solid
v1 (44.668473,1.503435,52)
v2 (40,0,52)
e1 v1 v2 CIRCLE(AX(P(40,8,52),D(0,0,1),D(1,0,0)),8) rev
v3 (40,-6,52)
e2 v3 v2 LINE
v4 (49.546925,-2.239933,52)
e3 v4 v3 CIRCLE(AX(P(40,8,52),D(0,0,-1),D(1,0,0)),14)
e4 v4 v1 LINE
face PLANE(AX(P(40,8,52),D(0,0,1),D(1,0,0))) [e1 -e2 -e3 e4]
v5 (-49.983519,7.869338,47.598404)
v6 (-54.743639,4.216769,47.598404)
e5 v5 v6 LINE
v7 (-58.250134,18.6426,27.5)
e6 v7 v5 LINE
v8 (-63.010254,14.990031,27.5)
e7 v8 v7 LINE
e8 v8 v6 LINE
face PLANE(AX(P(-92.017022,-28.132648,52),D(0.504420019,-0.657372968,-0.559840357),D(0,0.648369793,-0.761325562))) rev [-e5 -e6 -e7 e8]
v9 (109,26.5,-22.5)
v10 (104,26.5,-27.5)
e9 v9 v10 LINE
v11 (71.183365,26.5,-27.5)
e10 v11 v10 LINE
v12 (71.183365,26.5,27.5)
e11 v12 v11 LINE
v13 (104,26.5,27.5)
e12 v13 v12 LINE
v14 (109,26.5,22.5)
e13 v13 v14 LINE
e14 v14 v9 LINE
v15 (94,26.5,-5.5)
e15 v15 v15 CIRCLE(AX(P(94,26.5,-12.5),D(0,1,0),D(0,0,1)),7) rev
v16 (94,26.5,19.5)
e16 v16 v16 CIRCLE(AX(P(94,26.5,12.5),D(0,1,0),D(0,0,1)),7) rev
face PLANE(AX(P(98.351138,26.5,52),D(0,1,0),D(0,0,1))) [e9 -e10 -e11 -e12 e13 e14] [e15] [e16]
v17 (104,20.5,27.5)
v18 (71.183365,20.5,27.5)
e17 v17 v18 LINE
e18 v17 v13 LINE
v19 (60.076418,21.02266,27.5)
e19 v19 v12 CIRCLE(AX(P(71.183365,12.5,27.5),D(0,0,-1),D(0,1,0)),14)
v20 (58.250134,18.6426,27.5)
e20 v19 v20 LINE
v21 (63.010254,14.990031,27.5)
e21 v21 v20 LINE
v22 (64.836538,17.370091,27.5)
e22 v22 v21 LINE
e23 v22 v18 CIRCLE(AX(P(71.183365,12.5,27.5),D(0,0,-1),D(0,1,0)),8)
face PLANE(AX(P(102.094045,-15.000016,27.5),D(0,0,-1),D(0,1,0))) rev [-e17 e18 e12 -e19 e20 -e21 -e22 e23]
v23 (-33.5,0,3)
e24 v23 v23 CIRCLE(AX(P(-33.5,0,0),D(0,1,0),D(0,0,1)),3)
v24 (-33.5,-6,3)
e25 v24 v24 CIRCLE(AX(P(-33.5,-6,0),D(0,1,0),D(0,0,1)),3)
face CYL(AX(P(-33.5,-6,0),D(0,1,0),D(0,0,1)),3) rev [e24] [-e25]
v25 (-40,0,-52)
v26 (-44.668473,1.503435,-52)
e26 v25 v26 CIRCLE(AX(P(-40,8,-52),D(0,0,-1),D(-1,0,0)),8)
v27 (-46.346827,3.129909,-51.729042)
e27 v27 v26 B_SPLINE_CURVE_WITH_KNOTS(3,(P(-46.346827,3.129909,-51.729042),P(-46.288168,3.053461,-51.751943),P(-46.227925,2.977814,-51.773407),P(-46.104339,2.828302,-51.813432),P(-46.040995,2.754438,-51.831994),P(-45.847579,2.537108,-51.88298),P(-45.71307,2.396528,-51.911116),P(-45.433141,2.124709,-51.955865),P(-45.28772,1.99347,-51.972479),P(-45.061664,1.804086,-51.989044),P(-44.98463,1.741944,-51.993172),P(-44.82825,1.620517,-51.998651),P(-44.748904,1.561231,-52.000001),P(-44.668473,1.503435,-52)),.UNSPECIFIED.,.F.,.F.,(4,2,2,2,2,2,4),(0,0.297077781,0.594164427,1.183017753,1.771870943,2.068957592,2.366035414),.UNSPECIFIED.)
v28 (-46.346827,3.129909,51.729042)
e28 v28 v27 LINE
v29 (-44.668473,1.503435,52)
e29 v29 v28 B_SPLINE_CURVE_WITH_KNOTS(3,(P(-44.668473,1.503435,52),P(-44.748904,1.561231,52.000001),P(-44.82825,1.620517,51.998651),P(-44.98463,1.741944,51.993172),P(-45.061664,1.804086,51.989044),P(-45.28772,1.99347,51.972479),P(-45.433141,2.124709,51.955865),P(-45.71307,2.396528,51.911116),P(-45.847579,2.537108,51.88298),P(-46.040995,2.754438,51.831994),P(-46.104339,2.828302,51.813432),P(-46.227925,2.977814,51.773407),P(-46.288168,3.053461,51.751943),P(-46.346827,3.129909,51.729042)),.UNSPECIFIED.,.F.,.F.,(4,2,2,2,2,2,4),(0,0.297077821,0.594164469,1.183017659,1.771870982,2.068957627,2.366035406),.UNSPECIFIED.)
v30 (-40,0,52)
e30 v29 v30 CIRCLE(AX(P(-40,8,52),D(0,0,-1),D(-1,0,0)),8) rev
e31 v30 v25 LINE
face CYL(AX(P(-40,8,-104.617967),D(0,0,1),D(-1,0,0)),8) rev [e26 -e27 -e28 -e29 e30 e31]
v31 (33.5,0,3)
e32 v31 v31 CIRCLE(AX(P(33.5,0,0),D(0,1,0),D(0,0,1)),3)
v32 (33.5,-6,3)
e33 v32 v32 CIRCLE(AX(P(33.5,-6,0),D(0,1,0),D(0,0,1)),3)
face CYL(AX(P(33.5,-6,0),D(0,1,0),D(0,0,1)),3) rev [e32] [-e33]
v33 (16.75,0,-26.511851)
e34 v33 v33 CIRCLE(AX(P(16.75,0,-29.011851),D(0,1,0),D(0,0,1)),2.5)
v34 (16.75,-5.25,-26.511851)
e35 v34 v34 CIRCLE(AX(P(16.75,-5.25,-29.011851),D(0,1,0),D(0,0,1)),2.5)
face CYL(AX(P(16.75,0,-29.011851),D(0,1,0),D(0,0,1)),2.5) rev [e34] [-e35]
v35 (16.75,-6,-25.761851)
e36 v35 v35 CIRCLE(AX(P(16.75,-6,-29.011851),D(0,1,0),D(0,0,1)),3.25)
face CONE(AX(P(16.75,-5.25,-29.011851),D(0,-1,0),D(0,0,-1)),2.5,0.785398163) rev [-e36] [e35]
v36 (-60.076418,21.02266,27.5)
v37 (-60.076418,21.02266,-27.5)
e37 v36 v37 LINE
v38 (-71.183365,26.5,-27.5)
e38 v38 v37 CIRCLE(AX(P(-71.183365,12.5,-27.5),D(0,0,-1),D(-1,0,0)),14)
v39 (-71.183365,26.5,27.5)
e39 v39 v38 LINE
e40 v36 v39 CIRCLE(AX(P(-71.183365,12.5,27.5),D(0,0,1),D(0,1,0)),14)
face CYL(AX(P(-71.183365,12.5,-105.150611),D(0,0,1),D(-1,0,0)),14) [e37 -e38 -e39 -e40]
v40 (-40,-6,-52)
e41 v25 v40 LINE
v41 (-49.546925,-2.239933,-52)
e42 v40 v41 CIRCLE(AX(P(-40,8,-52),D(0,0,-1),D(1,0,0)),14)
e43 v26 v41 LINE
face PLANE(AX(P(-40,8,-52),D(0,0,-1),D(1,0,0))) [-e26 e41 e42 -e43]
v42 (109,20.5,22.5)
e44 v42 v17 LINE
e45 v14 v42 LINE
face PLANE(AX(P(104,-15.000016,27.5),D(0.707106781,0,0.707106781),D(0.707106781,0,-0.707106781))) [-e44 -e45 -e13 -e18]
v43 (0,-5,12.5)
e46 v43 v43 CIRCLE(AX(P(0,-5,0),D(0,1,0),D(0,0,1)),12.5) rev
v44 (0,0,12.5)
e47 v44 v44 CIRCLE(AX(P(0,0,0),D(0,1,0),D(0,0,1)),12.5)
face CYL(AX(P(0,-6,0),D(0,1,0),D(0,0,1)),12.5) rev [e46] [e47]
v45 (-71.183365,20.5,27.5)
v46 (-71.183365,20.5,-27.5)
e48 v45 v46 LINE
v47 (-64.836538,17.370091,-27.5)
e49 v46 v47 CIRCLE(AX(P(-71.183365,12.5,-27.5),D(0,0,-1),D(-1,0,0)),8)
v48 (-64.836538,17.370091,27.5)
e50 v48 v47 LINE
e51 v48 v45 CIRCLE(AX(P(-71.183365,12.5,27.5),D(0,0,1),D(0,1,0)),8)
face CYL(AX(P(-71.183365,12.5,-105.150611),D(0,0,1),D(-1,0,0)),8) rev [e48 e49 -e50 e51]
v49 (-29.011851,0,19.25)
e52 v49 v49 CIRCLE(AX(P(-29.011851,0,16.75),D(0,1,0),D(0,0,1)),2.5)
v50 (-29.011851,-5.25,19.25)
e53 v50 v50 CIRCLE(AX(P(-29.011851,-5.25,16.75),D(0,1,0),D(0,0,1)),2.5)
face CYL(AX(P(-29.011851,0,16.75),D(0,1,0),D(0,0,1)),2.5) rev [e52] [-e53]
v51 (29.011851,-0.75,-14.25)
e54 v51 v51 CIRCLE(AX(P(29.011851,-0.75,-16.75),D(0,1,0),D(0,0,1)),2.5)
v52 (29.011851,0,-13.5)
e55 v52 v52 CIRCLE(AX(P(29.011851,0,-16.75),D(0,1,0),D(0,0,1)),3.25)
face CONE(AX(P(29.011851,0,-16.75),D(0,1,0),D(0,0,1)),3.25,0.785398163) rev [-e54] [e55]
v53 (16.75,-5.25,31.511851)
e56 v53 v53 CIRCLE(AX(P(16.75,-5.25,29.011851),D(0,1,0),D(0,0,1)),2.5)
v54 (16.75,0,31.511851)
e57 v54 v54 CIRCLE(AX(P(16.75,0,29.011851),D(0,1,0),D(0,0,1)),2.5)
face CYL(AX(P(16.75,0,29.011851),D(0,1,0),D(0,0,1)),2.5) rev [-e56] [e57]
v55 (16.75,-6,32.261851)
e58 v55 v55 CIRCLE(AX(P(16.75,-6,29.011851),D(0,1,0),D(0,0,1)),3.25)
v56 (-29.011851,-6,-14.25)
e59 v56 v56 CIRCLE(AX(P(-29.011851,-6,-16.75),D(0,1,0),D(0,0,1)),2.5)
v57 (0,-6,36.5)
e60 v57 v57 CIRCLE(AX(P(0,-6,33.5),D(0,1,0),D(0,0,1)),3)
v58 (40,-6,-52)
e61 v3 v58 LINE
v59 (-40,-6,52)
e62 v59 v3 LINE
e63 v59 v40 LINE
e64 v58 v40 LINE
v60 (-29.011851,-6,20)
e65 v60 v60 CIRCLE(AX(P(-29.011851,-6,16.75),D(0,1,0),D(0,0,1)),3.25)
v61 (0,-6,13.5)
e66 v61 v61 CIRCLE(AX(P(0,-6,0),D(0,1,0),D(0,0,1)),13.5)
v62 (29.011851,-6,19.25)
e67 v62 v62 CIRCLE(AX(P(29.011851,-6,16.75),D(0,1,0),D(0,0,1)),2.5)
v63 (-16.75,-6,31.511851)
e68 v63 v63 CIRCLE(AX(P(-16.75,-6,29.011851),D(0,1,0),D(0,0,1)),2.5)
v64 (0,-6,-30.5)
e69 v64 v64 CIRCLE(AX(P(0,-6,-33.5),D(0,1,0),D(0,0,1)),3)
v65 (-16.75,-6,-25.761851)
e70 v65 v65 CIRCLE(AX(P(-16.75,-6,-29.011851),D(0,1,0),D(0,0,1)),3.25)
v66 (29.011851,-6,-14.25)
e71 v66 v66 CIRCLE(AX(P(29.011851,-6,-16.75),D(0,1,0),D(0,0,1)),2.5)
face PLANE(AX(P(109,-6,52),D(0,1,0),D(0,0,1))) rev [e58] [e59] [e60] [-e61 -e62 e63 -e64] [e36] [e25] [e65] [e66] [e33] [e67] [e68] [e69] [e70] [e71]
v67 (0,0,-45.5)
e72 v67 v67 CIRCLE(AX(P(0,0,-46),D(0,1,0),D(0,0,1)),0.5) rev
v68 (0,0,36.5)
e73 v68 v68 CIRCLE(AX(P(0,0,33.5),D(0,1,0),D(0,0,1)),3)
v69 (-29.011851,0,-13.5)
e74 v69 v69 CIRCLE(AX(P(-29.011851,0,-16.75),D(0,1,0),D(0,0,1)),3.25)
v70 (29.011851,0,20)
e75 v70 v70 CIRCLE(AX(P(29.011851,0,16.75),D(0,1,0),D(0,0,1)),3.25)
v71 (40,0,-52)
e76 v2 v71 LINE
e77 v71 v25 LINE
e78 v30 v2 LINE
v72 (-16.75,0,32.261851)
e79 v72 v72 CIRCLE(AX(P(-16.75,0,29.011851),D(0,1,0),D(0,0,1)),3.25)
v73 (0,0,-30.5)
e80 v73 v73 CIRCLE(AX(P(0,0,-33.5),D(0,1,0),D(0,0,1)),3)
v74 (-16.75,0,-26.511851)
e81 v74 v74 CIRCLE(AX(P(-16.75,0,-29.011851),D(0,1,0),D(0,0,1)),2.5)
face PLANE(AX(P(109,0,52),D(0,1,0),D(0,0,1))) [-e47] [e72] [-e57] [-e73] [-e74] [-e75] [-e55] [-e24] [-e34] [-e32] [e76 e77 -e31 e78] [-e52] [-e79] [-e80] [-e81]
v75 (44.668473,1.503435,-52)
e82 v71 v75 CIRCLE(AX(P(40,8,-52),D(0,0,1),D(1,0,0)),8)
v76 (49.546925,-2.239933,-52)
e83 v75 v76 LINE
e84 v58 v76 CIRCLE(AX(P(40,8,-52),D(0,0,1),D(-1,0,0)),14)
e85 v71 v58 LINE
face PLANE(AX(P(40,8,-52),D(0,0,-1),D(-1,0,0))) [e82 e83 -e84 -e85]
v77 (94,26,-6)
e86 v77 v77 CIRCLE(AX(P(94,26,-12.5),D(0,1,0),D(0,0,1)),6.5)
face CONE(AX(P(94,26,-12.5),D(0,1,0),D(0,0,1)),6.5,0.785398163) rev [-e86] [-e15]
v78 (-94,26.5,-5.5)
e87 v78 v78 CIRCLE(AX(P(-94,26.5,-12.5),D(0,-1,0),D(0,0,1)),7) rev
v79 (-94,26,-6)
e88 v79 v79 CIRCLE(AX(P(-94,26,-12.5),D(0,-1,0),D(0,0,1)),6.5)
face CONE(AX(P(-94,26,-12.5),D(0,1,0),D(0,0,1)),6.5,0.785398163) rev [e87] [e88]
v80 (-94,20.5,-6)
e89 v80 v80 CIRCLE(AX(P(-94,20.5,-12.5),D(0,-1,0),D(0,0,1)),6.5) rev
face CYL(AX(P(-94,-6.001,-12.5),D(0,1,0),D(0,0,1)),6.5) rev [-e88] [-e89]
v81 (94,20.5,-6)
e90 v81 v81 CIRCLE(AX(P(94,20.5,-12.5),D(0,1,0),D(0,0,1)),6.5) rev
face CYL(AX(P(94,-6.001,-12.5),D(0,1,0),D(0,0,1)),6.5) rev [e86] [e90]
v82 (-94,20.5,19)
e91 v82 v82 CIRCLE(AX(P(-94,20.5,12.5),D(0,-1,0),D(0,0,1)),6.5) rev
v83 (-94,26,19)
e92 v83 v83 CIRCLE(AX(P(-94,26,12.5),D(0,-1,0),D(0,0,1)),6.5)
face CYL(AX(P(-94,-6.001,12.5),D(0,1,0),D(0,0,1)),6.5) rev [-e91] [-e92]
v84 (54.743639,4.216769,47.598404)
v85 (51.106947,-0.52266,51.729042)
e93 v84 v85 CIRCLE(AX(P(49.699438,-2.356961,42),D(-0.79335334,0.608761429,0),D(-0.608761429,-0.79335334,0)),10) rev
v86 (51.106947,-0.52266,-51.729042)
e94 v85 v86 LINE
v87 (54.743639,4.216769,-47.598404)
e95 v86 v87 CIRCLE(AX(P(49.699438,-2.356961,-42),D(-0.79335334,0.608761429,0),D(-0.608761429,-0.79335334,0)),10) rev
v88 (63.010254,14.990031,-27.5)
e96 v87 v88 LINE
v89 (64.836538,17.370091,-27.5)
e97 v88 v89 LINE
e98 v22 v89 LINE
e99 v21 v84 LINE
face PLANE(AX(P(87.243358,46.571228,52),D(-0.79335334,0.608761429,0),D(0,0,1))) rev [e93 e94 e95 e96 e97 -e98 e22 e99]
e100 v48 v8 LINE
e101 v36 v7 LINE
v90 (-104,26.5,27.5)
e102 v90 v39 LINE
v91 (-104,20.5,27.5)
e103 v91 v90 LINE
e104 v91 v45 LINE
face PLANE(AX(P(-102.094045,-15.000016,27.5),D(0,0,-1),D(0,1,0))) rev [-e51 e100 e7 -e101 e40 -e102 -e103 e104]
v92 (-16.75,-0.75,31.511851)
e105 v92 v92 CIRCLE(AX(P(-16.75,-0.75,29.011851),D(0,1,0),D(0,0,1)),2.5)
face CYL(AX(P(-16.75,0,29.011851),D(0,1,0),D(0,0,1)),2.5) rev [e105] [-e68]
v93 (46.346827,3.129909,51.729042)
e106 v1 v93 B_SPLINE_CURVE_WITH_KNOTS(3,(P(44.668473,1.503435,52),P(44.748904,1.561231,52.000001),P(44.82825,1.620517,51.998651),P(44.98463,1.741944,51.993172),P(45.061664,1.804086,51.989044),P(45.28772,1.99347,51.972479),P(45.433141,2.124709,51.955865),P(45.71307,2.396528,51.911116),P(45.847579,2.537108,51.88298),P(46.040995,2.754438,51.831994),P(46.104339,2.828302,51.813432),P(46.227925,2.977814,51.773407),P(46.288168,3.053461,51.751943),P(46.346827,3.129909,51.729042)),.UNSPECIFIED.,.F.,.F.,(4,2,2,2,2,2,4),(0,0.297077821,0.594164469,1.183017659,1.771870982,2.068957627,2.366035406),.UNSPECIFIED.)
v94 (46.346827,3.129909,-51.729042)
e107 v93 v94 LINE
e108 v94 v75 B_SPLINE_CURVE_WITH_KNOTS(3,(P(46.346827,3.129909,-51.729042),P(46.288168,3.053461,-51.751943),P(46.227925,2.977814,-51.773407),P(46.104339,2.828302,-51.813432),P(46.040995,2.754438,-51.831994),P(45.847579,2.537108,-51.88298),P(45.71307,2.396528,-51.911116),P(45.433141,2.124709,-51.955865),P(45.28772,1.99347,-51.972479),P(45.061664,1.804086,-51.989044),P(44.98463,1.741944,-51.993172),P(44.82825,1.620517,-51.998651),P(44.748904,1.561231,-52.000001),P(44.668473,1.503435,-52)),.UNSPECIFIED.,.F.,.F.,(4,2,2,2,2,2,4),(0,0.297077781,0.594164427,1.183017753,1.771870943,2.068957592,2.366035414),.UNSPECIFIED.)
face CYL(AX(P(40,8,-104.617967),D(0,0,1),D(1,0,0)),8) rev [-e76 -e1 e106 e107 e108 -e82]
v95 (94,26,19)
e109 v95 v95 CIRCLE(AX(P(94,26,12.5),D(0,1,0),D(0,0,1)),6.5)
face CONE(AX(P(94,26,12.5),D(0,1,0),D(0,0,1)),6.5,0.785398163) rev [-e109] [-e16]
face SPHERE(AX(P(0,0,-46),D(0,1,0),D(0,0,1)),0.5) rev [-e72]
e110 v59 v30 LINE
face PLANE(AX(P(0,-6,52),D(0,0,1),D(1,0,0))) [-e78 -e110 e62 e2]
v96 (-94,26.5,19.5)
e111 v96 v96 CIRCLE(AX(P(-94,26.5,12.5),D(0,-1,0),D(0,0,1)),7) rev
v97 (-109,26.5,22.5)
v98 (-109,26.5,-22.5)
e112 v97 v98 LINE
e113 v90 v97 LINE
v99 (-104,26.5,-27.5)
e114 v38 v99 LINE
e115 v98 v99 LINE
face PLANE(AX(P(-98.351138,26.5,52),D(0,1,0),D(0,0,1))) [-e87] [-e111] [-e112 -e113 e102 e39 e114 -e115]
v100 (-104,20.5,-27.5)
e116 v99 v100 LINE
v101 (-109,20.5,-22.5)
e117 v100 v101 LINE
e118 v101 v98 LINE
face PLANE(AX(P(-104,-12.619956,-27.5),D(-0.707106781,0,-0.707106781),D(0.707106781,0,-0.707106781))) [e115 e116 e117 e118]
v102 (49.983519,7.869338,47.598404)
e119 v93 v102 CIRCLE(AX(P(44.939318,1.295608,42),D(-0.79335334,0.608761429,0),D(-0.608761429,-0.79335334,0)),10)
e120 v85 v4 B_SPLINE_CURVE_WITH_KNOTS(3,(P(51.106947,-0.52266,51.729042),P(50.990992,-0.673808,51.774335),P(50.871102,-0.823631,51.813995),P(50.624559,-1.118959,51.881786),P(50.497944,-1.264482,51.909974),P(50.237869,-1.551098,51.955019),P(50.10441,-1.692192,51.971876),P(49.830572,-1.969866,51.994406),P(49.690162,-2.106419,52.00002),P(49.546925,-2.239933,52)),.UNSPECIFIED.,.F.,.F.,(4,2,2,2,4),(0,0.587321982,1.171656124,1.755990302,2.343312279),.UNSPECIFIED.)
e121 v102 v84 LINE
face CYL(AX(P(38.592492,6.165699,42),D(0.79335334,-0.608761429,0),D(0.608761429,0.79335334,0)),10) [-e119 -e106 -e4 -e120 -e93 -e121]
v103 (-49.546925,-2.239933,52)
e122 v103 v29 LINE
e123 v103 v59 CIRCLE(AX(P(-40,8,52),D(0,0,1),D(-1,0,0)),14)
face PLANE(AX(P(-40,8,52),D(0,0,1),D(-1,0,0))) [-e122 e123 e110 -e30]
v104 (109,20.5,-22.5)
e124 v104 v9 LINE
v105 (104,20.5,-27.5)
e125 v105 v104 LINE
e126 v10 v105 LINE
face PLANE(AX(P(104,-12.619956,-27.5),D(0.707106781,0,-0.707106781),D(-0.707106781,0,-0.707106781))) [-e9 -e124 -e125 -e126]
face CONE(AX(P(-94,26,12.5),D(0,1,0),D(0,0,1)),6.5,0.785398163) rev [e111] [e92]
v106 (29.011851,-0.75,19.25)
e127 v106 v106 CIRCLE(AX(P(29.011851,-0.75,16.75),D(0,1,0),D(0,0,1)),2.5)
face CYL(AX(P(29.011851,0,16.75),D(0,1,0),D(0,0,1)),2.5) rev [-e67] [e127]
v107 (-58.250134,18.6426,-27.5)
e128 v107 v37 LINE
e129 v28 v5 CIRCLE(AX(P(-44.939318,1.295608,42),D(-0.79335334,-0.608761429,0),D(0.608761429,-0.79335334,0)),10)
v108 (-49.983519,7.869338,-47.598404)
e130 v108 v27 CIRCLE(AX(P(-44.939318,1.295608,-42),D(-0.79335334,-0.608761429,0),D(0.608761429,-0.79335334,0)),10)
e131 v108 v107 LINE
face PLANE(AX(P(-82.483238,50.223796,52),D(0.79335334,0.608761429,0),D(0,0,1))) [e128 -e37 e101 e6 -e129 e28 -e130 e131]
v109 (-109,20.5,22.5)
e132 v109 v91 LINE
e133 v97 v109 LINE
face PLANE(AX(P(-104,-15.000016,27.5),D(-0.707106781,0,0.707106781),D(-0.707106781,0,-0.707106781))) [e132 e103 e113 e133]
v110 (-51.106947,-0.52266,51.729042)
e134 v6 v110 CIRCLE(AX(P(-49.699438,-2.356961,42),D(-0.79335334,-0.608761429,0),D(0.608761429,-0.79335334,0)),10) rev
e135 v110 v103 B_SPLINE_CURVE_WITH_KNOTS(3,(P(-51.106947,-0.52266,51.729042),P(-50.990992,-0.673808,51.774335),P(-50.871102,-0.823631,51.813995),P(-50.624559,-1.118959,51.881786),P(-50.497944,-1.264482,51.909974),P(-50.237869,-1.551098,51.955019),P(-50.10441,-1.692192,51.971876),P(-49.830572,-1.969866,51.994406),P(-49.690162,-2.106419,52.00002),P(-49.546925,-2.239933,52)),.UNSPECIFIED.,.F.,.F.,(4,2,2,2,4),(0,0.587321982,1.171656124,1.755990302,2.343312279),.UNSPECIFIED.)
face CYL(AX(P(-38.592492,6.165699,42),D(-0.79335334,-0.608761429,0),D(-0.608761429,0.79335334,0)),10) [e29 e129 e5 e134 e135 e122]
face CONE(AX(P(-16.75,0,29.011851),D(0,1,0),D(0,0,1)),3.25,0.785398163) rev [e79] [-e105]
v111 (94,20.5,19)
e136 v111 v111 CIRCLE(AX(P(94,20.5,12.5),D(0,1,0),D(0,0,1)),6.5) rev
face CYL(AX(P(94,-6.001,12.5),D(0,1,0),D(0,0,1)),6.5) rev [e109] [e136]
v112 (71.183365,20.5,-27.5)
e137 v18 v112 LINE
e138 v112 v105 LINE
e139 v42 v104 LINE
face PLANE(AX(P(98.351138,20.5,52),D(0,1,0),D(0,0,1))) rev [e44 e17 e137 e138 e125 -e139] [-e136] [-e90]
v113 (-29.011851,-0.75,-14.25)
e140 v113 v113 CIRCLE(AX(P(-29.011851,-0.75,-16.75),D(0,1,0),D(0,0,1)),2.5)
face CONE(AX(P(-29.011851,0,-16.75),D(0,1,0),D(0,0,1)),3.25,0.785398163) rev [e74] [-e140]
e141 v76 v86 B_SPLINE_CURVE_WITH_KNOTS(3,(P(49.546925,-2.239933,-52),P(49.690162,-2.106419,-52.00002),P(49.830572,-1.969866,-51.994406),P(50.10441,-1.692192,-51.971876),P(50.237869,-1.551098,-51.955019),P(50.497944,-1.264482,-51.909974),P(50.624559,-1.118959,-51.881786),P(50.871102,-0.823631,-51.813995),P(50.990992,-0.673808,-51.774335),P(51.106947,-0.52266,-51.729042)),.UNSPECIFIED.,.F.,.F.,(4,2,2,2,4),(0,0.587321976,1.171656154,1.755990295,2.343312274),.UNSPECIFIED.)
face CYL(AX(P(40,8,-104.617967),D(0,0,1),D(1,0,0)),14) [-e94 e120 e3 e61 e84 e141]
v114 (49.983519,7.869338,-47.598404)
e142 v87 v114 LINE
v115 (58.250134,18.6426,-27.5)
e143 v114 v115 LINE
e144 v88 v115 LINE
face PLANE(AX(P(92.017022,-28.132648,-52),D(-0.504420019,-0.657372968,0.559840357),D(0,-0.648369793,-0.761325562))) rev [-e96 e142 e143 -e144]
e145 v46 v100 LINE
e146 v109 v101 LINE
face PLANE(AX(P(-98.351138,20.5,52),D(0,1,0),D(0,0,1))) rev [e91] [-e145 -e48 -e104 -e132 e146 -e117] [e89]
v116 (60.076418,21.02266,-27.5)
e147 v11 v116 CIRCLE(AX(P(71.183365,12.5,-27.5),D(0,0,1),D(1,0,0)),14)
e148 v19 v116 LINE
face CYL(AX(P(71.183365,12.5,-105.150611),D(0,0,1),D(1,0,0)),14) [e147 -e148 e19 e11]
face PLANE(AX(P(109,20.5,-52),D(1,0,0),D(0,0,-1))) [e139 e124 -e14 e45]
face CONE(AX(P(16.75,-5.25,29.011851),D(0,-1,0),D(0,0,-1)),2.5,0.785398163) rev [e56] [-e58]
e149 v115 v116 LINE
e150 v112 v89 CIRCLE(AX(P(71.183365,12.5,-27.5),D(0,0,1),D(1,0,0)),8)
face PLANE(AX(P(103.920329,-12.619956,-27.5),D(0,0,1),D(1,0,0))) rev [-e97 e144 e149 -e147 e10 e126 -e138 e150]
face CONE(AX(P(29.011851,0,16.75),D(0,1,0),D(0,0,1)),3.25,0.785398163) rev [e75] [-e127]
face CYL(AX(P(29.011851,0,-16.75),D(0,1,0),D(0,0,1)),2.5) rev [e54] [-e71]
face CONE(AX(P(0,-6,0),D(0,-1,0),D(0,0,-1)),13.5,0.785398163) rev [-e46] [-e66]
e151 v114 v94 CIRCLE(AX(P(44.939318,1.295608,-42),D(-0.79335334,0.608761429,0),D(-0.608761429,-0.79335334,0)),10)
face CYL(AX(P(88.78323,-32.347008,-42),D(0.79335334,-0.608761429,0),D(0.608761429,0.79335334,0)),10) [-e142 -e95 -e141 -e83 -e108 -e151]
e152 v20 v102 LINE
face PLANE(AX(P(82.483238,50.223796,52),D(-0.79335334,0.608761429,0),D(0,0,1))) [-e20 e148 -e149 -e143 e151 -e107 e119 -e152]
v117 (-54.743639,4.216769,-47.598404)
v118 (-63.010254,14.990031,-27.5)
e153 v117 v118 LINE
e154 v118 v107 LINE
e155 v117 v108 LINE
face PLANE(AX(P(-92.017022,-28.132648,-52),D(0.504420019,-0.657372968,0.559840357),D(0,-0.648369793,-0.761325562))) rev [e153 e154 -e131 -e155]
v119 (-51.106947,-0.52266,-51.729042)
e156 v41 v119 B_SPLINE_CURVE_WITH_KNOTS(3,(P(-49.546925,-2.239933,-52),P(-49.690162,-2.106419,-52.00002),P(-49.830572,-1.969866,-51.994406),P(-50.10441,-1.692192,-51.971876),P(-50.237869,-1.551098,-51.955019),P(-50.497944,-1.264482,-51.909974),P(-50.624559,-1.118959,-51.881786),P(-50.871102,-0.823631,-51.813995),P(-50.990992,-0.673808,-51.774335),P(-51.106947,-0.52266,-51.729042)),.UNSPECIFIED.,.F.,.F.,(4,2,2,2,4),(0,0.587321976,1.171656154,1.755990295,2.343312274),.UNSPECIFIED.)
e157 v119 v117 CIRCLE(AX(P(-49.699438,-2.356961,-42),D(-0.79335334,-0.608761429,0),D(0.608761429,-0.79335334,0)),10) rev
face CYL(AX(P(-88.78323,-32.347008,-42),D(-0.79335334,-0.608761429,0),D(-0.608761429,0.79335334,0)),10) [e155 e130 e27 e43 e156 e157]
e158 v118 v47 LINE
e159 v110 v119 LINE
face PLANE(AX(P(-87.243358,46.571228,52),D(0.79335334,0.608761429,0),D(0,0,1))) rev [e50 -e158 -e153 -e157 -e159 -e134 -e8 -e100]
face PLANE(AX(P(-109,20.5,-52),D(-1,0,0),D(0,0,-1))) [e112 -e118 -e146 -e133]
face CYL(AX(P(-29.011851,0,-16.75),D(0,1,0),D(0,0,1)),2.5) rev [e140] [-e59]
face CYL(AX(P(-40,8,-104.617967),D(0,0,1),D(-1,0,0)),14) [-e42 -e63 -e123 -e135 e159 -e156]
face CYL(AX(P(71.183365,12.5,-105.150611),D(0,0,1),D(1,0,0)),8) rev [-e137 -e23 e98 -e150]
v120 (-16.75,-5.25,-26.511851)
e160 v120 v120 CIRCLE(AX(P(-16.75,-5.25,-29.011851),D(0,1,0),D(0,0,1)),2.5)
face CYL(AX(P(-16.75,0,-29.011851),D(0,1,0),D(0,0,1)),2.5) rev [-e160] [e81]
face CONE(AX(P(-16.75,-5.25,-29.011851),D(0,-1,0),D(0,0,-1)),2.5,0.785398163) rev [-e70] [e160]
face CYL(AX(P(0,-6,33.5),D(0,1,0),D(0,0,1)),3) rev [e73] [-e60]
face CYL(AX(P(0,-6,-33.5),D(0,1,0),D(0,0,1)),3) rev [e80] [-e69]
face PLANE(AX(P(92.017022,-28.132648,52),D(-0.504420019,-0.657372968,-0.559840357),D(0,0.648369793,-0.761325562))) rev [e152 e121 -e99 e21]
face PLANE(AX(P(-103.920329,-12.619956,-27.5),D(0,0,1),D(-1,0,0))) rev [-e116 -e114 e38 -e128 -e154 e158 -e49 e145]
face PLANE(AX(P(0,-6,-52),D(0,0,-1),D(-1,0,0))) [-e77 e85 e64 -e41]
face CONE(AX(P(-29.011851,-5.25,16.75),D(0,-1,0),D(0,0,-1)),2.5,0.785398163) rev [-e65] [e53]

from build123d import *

# Parameters (mm, degrees)
SKETCH_1_W             = 109
SKETCH_1_H             = 104
SM_BASE_FLANGE_1_DEPTH = 6
OTHER_START            = -52
OTHER_1_DEPTH          = 104
OTHER_1_2_DEPTH        = 104
CUT_EXTRUDE_1_DEPTH    = 108.693293005
CUT_EXTRUDE_2_REACH    = 127.065
SKETCH_8_R             = 6.5
CHAMFER_1_SIZE         = 0.5
CHAMFER_2_SIZE         = 5
FILLET_1_R             = 10
M6X1_01_D              = 5
M6X1_01_CSINK_D        = 6.5
M6X1_01_CSINK_ANGLE    = 90
M6X1_02_AT_2_COUNT     = 2
M6X1_02_AT_2_PITCH     = 47.376154339
M6X1_02_AT_3_COUNT     = 2
M6X1_02_AT_3_PITCH     = 47.376154339
M6X1_02_AT_4_COUNT     = 2
M6X1_02_AT_4_PITCH     = 64.717030361
SKETCH_9_R             = 12.5
SKETCH_9_R_2           = 3
CUT_EXTRUDE_3_DEPTH    = 6
CHAMFER_3_SIZE         = 1


# Read off the part's stored shape, not the designer's step: Изгиб1
# Sheet-metal steps are written as plain solids
with BuildPart() as part:
    # Sketch 1 → Базовая кромка1 (new body)
    with BuildSketch(Plane(origin=(0, 0, 0), x_dir=(1, 0, 0), z_dir=(0, 1, 0))):
        with Locations((54.5, 0)):
            Rectangle(SKETCH_1_W, SKETCH_1_H)
    extrude(amount=-SM_BASE_FLANGE_1_DEPTH)

    # Other 1 outline → Other 1 (cut)
    with BuildSketch(Plane.XY.offset(OTHER_START)):
        with BuildLine():
            Line((109, 0), (51.507997892, 0))
            Line((51.507997892, 0), (51.106946786, -0.522660023))
            ThreePointArc((51.106946786, -0.522660023), (46.192041675, -4.556218407), (40, -6.000000028))
            Line((40, -6.000000028), (109, -6))
            Line((109, -6), (109, 0))
        make_face()
    extrude(amount=OTHER_1_DEPTH, mode=Mode.SUBTRACT)

    # Other 1 2 outline → Other 1 2 (add)
    with BuildSketch(Plane.XY.offset(OTHER_START)):
        with BuildLine():
            ThreePointArc((71.183364554, 26.500000037), (64.991322874, 25.056218415), (60.07641776, 21.022660029))
            Line((60.07641776, 21.022660029), (46.346826745, 3.129908551))
            ThreePointArc((46.346826745, 3.129908551), (43.538309534, 0.825018043), (40, -2.8e-08))
            Line((40, -2.8e-08), (51.507997892, 0))
            Line((51.507997892, 0), (64.836537802, 17.370091455))
            ThreePointArc((64.836537802, 17.370091455), (67.645055016, 19.674981966), (71.183364554, 20.500000037))
            Line((71.183364554, 20.500000037), (109, 20.5))
            Line((109, 20.5), (109, 26.5))
            Line((109, 26.5), (71.183364554, 26.500000037))
        make_face()
    extrude(amount=OTHER_1_2_DEPTH)

    # Эскиз5 → Вытянуть1 (cut, through all)
    with BuildSketch(Plane(origin=(27.659504319, -21.223884138, 0), x_dir=(0.608761429008719, 0.7933533402912364, 0), z_dir=(-0.7933533402912364, 0.608761429008719, 0))):
        Polygon((33.697283883, 52), (50.250603481, 27.5), (53.250603481, 27.5), (87.37885928, 27.5), (87.37885928, 52), align=None)
        Polygon((87.37885928, -52), (33.697283883, -52), (50.250603481, -27.5), (53.250603481, -27.5), (87.37885928, -27.5), align=None)
    extrude(amount=-CUT_EXTRUDE_1_DEPTH, mode=Mode.SUBTRACT)

    # Эскиз8 → Вытянуть2 (cut, up to next)
    with BuildSketch(Plane(origin=(0, 26.5, 0), x_dir=(1, 0, 0), z_dir=(0, 1, 0)), mode=Mode.PRIVATE) as cut_extrude_2_sk1:
        with Locations(Location((94, 12.5, 0), (0, 0, 270))):
            Circle(SKETCH_8_R)
    cut_extrude_2_tool1 = extrude(cut_extrude_2_sk1.sketch, amount=-CUT_EXTRUDE_2_REACH, mode=Mode.PRIVATE) & part.part
    # Эскиз8 → Вытянуть2 (cut, up to next)
    with BuildSketch(Plane(origin=(0, 26.5, 0), x_dir=(1, 0, 0), z_dir=(0, 1, 0)), mode=Mode.PRIVATE) as cut_extrude_2_sk2:
        with Locations(Location((94, -12.5, 0), (0, 0, 270))):
            Circle(SKETCH_8_R)
    cut_extrude_2_tool2 = extrude(cut_extrude_2_sk2.sketch, amount=-CUT_EXTRUDE_2_REACH, mode=Mode.PRIVATE) & part.part
    add(cut_extrude_2_tool1.solids().sort_by_distance((94, 26.5, -12.5))[0], mode=Mode.SUBTRACT)
    add(cut_extrude_2_tool2.solids().sort_by_distance((94, 26.5, 12.5))[0], mode=Mode.SUBTRACT)

    # Фаска1
    chamfer_1_edges = [part.edges().sort_by_distance(p)[0] for p in [
        (94, 26.5, -19),
        (94, 26.5, 6),
    ]]
    chamfer(chamfer_1_edges, length=CHAMFER_1_SIZE)

    # Фаска2
    chamfer_2_edges = [part.edges().sort_by_distance(p)[0] for p in [
        (109, 23.5, -27.5),
        (109, 23.5, 27.5),
    ]]
    chamfer(chamfer_2_edges, length=CHAMFER_2_SIZE)

    # Скругление1
    fillet_1_edges = [part.edges().sort_by_distance(p)[0] for p in [
        (50.553171029, 3.683684303, -52),
        (50.553171029, 3.683684303, 52),
    ]]
    fillet(fillet_1_edges, radius=FILLET_1_R)

    # Зеркальное отражение1: part across plane


with BuildPart() as part_1:
    add(part.part)
    add(part.part.mirror(Plane(origin=(0, -6, -52), x_dir=(0, 0, 1), z_dir=(-1, 0, 0))))

    # Отверстие обработанное метчиком M6x1.01 (through all)
    with Locations(Plane(origin=(29.011851027, 0, 16.75), x_dir=(0, 0, 1), z_dir=(0, 1, 0))):
        with Locations((0, 0), (12.261851027, -45.761851027), (-33.5, -58.023702054), (-33.5, 0)):
            CounterSinkHole(M6X1_01_D / 2, M6X1_01_CSINK_D / 2, counter_sink_angle=M6X1_01_CSINK_ANGLE)

    # Эскиз11 → Отверстие обработанное метчиком M6x1.02 (revolve, cut)
    with BuildSketch(Plane(origin=(-29.011851027, 0, 16.75), x_dir=(0, 0, 1), z_dir=(1, 0, 0))):
        Polygon((0, 0), (0, 6.000000028), (3.25, 6.000000028), (2.5, 5.250000028), (2.5, 0), align=None)
    m6x1_02 = revolve(axis=Axis((-29.011851027, 6.35, 16.75), (0, -1, 0)), mode=Mode.SUBTRACT)

    # Отверстие обработанное метчиком M6x1.02 at 2: Отверстие обработанное метчиком M6x1.02 ×2
    with Locations(*[Vector(0.9659258262890683, 0, 0.2588190451025209) * (i * M6X1_02_AT_2_PITCH) for i in range(1, M6X1_02_AT_2_COUNT)]):
        add(m6x1_02, mode=Mode.SUBTRACT)

    # Отверстие обработанное метчиком M6x1.02 at 3: Отверстие обработанное метчиком M6x1.02 ×2
    with Locations(*[Vector(0.25881904510252063, 0, -0.9659258262890683) * (i * M6X1_02_AT_3_PITCH) for i in range(1, M6X1_02_AT_3_COUNT)]):
        add(m6x1_02, mode=Mode.SUBTRACT)

    # Отверстие обработанное метчиком M6x1.02 at 4: Отверстие обработанное метчиком M6x1.02 ×2
    with Locations(*[Vector(0.7071067811865474, 0, -0.7071067811865478) * (i * M6X1_02_AT_4_PITCH) for i in range(1, M6X1_02_AT_4_COUNT)]):
        add(m6x1_02, mode=Mode.SUBTRACT)

    # Эскиз9 → Вытянуть3 (cut)
    with BuildSketch(Plane(origin=(0, 0, 0), x_dir=(1, 0, 0), z_dir=(0, 1, 0))):
        with Locations(Location((0, 0, 0), (0, 0, 270))):
            Circle(SKETCH_9_R)
        with Locations(Location((0, 33.5, 0), (0, 0, 270))):
            Circle(SKETCH_9_R_2)
        with Locations(Location((0, -33.5, 0), (0, 0, 270))):
            Circle(SKETCH_9_R_2)
        with Locations(Location((-33.5, 0, 0), (0, 0, 270))):
            Circle(SKETCH_9_R_2)
        with Locations(Location((33.5, 0, 0), (0, 0, 270))):
            Circle(SKETCH_9_R_2)
    extrude(amount=-CUT_EXTRUDE_3_DEPTH, mode=Mode.SUBTRACT)

    # Фаска3
    chamfer_3_edges = [part_1.edges().sort_by_distance(p)[0] for p in [
        (0, -6, -12.5),
    ]]
    chamfer(chamfer_3_edges, length=CHAMFER_3_SIZE)

    # Эскиз12 → Вырез-Повернуть1 (revolve, cut)
    with BuildSketch(Plane(origin=(0, 0, 0), x_dir=(1, 0, 0), z_dir=(0, 1, 0))):
        with BuildLine():
            Line((0, 46.5), (0, 45.5))
            ThreePointArc((0, 45.5), (0.5, 46), (0, 46.5))
        make_face()
    revolve(axis=Axis((0, 0, -52), (0, 0, 1)), mode=Mode.SUBTRACT)


solid = part_1.part
